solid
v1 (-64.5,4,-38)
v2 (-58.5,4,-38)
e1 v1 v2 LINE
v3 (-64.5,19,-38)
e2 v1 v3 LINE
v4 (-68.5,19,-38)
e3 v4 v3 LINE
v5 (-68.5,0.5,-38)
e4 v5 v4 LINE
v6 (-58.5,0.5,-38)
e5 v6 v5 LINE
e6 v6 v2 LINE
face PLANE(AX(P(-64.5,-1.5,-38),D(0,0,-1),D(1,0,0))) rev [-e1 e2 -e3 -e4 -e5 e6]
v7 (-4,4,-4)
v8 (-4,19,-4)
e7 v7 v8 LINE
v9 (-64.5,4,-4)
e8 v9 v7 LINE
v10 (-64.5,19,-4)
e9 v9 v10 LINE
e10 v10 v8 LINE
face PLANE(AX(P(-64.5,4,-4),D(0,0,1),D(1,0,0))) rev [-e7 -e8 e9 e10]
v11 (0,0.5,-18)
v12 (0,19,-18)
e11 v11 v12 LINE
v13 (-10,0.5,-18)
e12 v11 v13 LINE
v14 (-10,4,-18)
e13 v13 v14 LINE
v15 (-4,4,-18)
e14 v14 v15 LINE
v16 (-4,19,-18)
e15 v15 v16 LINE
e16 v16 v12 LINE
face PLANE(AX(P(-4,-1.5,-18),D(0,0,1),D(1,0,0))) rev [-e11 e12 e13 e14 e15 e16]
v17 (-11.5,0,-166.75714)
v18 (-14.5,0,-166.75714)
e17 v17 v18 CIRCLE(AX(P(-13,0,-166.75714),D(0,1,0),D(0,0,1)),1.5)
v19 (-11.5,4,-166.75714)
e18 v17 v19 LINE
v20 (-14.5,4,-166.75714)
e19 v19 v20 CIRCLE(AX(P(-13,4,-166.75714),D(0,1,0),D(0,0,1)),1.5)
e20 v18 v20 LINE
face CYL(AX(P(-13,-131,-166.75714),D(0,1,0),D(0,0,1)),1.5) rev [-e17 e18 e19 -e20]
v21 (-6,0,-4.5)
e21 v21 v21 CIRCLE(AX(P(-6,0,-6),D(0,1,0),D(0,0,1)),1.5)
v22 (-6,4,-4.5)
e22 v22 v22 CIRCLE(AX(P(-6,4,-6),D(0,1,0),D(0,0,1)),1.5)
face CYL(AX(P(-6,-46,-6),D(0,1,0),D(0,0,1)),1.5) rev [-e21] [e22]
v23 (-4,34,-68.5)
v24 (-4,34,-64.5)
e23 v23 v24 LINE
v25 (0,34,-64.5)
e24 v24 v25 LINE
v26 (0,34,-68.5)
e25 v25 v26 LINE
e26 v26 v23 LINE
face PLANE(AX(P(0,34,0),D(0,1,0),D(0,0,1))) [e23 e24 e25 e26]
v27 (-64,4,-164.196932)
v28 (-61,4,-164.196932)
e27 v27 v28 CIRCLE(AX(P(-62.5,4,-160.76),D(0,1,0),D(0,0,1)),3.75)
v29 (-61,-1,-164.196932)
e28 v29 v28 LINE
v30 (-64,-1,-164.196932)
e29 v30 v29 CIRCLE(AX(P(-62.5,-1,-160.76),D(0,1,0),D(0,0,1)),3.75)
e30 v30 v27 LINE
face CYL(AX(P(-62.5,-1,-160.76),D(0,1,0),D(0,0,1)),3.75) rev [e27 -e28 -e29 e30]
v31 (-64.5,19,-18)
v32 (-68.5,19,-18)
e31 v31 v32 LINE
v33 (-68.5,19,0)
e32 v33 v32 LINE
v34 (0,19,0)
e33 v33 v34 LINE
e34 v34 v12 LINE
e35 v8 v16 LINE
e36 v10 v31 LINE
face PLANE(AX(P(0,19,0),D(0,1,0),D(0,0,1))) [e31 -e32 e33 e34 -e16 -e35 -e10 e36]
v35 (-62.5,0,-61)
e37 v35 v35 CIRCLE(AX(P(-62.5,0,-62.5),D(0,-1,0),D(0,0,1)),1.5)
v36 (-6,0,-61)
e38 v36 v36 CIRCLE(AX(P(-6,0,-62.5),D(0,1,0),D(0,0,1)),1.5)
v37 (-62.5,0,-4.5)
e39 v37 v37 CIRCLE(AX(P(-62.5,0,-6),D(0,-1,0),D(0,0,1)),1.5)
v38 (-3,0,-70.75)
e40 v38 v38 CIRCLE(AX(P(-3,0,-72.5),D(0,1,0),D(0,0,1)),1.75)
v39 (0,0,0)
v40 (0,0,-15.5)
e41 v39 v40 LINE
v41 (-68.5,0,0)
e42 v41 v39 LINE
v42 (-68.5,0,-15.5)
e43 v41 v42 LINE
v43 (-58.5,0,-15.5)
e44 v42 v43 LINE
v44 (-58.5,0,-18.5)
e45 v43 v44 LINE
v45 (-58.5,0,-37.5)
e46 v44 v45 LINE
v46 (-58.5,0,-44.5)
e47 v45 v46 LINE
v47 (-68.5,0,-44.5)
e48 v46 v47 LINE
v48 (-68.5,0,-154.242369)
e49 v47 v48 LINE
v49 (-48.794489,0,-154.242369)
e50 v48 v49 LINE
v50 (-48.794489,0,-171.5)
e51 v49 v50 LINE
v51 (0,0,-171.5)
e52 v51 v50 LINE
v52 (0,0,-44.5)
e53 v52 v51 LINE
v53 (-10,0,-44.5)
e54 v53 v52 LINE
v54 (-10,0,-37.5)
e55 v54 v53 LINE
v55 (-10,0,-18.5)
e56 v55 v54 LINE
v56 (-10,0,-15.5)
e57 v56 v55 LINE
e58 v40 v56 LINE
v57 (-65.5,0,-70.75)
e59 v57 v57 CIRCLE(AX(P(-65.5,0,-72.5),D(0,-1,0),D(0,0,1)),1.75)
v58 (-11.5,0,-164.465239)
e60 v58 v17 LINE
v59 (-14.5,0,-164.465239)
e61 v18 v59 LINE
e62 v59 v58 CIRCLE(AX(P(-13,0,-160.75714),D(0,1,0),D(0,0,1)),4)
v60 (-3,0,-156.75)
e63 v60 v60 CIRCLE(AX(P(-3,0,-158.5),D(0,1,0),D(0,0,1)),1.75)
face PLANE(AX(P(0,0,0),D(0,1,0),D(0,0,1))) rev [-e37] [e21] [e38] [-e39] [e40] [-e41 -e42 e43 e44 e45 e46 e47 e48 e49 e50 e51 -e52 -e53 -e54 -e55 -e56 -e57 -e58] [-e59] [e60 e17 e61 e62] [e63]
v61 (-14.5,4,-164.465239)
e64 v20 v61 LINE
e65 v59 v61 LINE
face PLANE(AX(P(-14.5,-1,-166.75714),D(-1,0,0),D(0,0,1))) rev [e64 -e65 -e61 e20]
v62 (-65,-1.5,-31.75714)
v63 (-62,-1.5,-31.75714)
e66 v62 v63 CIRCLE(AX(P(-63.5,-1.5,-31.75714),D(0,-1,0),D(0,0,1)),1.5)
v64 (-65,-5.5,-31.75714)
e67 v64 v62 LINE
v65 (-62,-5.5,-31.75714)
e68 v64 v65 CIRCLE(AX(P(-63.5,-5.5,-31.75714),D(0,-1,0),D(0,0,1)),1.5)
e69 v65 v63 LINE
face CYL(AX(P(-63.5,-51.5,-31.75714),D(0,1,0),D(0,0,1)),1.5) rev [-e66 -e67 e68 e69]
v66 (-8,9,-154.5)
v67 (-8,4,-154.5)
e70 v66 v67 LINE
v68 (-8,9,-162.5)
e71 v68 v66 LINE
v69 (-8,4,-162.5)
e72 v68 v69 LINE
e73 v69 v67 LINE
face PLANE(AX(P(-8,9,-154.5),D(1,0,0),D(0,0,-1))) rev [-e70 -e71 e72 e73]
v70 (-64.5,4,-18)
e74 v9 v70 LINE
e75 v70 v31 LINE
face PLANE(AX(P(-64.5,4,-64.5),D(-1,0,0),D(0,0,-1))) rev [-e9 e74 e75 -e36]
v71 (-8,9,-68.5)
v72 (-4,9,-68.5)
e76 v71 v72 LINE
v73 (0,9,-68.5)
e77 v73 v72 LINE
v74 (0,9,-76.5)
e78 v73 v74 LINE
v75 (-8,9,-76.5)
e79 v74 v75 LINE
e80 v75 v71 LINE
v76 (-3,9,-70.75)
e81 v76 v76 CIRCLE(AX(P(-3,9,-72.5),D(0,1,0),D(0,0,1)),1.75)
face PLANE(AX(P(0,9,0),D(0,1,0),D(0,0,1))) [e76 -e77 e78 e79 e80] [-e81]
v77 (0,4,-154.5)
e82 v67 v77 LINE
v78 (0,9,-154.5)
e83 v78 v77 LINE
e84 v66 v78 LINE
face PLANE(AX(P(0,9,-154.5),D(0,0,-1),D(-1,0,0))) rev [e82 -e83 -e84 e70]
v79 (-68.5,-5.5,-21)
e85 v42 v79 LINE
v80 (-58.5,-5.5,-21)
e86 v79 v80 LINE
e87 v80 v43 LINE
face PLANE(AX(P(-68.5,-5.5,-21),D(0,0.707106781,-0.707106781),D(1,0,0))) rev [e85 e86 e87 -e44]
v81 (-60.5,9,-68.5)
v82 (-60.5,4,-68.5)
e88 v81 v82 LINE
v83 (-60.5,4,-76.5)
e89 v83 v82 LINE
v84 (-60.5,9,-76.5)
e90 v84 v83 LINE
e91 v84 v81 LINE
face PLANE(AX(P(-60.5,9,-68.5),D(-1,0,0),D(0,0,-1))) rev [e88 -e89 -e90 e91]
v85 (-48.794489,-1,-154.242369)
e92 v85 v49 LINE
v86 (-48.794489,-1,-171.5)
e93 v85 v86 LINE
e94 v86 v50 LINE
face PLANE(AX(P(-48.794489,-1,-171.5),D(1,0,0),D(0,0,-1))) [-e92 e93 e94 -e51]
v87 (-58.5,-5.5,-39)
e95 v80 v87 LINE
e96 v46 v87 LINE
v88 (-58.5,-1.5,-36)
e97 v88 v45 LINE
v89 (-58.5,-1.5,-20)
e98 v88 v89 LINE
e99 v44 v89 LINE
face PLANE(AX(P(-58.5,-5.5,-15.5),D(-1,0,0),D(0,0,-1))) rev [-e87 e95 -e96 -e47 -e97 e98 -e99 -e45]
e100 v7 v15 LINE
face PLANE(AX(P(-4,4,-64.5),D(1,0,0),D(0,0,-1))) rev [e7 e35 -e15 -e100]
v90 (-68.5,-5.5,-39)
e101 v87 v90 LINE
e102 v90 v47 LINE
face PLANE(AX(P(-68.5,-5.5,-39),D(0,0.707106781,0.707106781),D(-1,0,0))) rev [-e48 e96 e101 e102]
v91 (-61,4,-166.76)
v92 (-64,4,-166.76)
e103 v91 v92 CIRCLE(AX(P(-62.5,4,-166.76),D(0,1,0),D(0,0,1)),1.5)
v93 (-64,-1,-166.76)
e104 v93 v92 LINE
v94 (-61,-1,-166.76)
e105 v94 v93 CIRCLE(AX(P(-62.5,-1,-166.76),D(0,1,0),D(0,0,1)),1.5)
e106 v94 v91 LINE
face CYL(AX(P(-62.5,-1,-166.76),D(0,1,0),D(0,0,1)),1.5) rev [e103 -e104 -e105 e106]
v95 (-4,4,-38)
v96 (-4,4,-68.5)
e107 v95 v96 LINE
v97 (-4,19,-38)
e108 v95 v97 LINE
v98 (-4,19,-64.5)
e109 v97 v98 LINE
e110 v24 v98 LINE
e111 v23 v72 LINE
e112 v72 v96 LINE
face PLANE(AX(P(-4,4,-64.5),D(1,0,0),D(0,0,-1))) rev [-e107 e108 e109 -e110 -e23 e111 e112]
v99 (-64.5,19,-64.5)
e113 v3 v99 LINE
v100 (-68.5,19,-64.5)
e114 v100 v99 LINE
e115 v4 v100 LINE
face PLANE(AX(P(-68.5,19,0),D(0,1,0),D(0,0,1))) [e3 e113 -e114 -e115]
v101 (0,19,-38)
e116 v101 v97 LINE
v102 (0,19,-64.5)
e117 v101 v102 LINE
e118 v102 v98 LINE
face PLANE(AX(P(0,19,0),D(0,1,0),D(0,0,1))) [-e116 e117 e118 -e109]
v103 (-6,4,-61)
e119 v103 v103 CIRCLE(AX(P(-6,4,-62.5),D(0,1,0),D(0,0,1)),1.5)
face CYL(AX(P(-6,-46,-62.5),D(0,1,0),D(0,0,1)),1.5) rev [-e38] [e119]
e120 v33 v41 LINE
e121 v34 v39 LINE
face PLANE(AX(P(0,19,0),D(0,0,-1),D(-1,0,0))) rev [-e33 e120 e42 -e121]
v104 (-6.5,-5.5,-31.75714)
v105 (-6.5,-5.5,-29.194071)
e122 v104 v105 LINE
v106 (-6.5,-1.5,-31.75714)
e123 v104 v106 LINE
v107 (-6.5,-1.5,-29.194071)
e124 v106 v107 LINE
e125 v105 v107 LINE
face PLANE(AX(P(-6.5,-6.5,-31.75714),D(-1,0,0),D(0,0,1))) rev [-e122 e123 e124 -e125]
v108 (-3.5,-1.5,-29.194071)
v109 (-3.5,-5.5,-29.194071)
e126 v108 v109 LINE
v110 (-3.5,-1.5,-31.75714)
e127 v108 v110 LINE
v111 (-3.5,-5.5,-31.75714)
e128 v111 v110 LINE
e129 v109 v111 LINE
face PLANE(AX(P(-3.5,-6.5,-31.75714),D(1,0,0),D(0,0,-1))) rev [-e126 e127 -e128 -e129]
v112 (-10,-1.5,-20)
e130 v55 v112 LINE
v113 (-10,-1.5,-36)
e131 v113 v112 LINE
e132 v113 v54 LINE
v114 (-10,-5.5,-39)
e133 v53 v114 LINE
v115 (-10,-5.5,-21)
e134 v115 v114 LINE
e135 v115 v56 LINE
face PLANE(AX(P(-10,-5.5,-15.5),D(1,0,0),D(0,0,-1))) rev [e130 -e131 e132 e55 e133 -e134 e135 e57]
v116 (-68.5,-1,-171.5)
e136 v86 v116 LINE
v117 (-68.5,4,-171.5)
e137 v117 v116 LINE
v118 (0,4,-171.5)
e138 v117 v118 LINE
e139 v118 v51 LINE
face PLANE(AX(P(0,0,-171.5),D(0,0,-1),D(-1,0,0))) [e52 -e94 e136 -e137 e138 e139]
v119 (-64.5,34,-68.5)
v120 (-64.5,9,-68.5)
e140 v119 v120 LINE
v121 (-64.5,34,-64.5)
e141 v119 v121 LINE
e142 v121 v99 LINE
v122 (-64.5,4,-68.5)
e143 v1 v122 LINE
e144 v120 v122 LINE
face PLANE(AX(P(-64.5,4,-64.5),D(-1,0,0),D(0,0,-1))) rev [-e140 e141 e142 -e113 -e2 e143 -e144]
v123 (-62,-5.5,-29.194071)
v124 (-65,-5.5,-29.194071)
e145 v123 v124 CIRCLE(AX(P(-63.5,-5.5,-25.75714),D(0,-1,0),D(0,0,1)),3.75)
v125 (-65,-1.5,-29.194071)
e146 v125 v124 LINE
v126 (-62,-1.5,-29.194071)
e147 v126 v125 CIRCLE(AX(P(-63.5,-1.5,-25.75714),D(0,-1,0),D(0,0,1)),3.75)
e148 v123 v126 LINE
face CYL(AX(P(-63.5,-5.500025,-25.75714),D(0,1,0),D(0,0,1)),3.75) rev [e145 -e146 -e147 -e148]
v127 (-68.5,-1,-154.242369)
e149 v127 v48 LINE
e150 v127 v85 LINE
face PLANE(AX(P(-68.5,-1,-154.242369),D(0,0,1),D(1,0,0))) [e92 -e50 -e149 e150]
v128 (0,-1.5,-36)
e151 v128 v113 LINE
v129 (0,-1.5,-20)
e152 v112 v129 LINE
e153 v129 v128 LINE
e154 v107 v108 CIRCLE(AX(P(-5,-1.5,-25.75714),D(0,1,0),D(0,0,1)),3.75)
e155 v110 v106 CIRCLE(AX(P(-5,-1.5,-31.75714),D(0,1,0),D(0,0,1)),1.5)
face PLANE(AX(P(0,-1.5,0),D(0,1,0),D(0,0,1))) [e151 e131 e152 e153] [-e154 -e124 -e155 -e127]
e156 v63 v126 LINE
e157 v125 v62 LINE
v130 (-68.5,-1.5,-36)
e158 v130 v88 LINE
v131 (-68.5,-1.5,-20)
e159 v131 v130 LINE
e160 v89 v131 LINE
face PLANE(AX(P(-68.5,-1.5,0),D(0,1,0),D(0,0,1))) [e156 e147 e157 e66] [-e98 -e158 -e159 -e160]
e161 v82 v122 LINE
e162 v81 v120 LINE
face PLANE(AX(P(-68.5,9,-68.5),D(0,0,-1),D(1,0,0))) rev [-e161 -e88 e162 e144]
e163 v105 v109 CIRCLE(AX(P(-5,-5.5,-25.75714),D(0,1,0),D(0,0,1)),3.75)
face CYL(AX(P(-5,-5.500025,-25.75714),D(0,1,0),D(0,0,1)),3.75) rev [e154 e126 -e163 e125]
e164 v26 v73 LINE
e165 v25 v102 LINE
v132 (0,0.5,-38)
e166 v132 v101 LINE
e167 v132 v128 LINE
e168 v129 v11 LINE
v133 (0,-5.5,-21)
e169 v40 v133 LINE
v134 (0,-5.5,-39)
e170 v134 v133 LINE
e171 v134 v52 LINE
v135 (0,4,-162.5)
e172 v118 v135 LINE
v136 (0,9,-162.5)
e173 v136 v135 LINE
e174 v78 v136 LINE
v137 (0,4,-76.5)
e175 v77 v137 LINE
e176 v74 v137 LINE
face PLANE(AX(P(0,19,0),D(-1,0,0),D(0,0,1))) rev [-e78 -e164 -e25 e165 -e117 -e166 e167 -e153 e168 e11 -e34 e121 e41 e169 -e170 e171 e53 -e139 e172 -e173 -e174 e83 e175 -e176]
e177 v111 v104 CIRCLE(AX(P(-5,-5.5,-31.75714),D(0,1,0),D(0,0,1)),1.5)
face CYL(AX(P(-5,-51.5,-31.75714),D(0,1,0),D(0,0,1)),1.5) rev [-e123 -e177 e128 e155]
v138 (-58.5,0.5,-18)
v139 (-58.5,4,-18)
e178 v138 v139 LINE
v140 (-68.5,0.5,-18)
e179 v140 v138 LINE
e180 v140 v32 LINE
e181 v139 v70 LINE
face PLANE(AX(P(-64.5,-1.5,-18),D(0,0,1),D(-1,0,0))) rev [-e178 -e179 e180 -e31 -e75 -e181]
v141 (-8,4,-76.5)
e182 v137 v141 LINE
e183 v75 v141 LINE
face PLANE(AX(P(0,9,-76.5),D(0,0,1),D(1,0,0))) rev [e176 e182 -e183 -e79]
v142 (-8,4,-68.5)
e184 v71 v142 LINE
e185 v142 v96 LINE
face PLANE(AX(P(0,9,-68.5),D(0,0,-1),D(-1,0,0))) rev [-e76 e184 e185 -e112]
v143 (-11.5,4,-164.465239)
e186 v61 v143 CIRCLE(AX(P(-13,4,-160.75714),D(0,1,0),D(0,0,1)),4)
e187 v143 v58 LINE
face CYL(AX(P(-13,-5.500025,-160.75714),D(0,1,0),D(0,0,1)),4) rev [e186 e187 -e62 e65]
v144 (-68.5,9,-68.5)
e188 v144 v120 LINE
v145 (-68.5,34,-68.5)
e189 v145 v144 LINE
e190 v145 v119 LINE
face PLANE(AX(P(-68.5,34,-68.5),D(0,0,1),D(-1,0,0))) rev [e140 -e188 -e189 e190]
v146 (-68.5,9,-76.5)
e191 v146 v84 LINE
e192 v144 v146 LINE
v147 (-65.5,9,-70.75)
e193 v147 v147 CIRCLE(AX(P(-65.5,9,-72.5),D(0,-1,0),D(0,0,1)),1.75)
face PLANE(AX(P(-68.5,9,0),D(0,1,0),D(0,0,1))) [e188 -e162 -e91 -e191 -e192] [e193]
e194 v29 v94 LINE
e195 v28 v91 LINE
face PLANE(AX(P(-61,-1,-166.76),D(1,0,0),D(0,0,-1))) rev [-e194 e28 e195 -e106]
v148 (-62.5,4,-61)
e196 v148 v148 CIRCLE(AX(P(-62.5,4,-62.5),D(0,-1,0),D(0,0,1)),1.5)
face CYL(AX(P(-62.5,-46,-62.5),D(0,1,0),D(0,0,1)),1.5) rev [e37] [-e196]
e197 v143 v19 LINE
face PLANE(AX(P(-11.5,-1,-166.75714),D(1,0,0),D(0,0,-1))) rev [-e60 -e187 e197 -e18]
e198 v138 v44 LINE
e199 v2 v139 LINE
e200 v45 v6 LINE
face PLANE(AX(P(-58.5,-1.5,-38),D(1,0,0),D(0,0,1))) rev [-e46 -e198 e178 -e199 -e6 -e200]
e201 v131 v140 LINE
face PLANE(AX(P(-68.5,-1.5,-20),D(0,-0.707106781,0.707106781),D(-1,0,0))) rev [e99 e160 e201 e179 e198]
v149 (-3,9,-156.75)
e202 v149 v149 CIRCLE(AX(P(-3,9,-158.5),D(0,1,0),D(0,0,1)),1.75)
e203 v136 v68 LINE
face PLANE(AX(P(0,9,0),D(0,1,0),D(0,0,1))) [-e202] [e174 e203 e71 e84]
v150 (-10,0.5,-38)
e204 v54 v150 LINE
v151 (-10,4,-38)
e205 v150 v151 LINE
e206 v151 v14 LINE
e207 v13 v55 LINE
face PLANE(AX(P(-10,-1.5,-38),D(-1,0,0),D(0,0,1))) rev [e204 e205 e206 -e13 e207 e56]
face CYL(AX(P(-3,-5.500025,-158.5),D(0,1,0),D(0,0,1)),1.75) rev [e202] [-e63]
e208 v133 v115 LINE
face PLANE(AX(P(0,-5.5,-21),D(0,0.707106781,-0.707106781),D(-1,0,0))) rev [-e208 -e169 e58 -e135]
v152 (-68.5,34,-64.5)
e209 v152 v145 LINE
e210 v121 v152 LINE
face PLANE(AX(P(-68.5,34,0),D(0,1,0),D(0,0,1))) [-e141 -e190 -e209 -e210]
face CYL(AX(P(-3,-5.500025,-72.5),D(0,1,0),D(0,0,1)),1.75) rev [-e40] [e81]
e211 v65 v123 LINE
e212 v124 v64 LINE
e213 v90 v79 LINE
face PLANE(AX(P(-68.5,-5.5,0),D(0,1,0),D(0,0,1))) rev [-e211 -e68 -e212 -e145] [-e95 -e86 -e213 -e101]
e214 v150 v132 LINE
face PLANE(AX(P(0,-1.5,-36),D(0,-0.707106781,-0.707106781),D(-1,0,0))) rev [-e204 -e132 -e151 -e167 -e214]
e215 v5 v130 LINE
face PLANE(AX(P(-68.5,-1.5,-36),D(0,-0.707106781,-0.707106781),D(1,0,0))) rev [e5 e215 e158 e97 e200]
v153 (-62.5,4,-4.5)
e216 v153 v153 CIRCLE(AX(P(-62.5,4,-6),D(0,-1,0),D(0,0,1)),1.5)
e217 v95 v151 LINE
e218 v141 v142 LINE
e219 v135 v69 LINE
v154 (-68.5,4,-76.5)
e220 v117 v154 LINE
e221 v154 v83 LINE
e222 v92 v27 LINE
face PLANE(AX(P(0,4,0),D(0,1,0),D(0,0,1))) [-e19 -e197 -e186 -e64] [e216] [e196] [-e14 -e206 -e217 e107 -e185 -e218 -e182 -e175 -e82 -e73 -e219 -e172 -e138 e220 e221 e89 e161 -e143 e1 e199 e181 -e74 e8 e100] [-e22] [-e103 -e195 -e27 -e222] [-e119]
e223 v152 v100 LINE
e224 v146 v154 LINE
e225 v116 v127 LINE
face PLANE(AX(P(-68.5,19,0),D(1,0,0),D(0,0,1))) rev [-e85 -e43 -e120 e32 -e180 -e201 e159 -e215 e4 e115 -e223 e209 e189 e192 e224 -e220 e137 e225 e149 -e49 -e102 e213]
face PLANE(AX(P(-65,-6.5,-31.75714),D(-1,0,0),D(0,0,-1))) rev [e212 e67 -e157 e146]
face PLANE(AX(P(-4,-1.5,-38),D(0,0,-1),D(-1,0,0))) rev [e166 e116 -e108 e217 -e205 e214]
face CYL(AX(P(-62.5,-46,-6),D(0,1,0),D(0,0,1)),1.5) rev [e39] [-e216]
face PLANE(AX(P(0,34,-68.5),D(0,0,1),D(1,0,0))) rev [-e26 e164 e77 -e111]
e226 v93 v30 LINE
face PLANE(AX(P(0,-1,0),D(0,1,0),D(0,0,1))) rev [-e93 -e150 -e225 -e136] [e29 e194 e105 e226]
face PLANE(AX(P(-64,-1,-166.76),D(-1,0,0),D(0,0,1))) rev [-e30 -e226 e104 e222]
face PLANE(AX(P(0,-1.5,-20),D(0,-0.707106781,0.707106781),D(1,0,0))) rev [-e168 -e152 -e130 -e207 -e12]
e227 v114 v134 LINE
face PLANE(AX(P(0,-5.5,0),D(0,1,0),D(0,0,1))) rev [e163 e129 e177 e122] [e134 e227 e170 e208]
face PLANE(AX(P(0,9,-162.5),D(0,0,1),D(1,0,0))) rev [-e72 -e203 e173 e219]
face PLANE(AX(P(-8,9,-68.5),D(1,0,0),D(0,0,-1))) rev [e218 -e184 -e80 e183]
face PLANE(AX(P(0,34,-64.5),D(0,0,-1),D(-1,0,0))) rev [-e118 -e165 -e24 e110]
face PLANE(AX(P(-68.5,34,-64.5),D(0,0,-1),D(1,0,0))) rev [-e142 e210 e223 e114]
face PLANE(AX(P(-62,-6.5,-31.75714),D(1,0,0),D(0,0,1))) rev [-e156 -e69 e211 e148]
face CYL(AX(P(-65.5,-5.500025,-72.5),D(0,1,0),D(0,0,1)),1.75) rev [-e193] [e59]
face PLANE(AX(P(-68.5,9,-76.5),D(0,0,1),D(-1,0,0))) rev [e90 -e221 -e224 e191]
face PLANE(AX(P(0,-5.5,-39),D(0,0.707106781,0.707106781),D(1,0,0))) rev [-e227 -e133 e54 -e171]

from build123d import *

# Parameters (mm, degrees)
SKETCH1_W            = 68.5
SKETCH1_H            = 64.5
BOSS_EXTRUDE3_DEPTH  = 19
SKETCH3_W            = 60.5
SKETCH3_H            = 60.5
CUT_EXTRUDE1_DEPTH   = 15
SKETCH5_W            = 68.5
SKETCH5_H            = 4
BOSS_EXTRUDE4_DEPTH  = 105
SKETCH10_W           = 10
SKETCH10_H           = 29
BOSS_EXTRUDE5_DEPTH  = 5.5
SKETCH9_W            = 4
SKETCH9_H            = 20
CUT_EXTRUDE2_DEPTH   = 20.5
SKETCH11_W           = 6
SKETCH11_H           = 20
CUT_EXTRUDE3_DEPTH   = 5.5
CHAMFER2_SIZE        = 5.5
CHAMFER3_SIZE        = 2
SKETCH12_W           = 34.25
SKETCH12_H           = 169.5
CUT_EXTRUDE4_DEPTH   = 50
SKETCH15_R           = 1.5
CUT_EXTRUDE5_DEPTH   = 50
SKETCH16_R           = 1.5
CUT_EXTRUDE6_DEPTH   = 50
SKETCH17_R           = 1.5
CUT_EXTRUDE7_DEPTH   = 50
SKETCH19_W           = 34.25
SKETCH19_H           = 4
BOSS_EXTRUDE6_DEPTH  = 2
SKETCH26_W           = 4
SKETCH26_H           = 4
BOSS_EXTRUDE7_DEPTH  = 30
SKETCH20_R           = 3.75
CUT_EXTRUDE9_DEPTH   = 179.453250181
SKETCH21_W           = 3
SKETCH21_H           = 2.563068229
CUT_EXTRUDE10_DEPTH  = 5
SKETCH18_R           = 1.5
CUT_EXTRUDE8_DEPTH   = 135
SKETCH24_R           = 4
CUT_EXTRUDE13_DEPTH  = 178.441011325
SKETCH25_W           = 3
SKETCH25_H           = 2.291900756
CUT_EXTRUDE14_DEPTH  = 5
SKETCH27_R           = 1.75
CUT_EXTRUDE15_DEPTH  = 178.441011325
BOSS_EXTRUDE9_START  = 5
SKETCH30_W           = 8
SKETCH30_H           = 8
SKETCH30_R           = 1.75
BOSS_EXTRUDE9_DEPTH  = 5
SKETCH31_W           = 8
SKETCH31_H           = 8
CUT_EXTRUDE16_DEPTH  = 5
SKETCH32_W           = 19.705511252
SKETCH32_H           = 17.257631466
BOSS_EXTRUDE10_DEPTH = 5
SKETCH33_R           = 1.5
CUT_EXTRUDE17_DEPTH  = 5
SKETCH34_R           = 3.75
CUT_EXTRUDE18_DEPTH  = 5
SKETCH35_W           = 3
SKETCH35_H           = 2.563068229
CUT_EXTRUDE19_DEPTH  = 5


# Some blends are built 0.0001 mm under size
with BuildPart() as part:
    # Sketch1 → Boss-Extrude3 (new body)
    with BuildSketch(Plane(origin=(0, 0, 0), x_dir=(1, 0, 0), z_dir=(0, 1, 0))):
        with Locations((-34.25, 32.25)):
            Rectangle(SKETCH1_W, SKETCH1_H)
    extrude(amount=BOSS_EXTRUDE3_DEPTH)

    # Sketch3 → Cut-Extrude1 (cut)
    with BuildSketch(Plane(origin=(0, 19, 0), x_dir=(1, 0, 0), z_dir=(0, 1, 0))):
        with Locations((-34.25, 34.25)):
            Rectangle(SKETCH3_W, SKETCH3_H)
    extrude(amount=-CUT_EXTRUDE1_DEPTH, mode=Mode.SUBTRACT)

    # Sketch5 → Boss-Extrude4 (add)
    with BuildSketch(Plane(origin=(0, 0, -64.5), x_dir=(-1, 0, 0), z_dir=(0, 0, -1))):
        with Locations((34.25, 2)):
            Rectangle(SKETCH5_W, SKETCH5_H)
    extrude(amount=BOSS_EXTRUDE4_DEPTH)

    # Sketch10 → Boss-Extrude5 (add)
    with BuildSketch(Plane.XZ):
        with Locations((-5, -30)):
            Rectangle(SKETCH10_W, SKETCH10_H)
    extrude(amount=BOSS_EXTRUDE5_DEPTH)

    # Sketch9 → Cut-Extrude2 (cut)
    with BuildSketch(Plane(origin=(0, 19, 0), x_dir=(1, 0, 0), z_dir=(0, 1, 0))):
        with Locations((-2, 28)):
            Rectangle(SKETCH9_W, SKETCH9_H)
    extrude(amount=-CUT_EXTRUDE2_DEPTH, mode=Mode.SUBTRACT)

    # Sketch11 → Cut-Extrude3 (cut)
    with BuildSketch(Plane(origin=(0, 4, 0), x_dir=(1, 0, 0), z_dir=(0, 1, 0))):
        with Locations((-7, 28)):
            Rectangle(SKETCH11_W, SKETCH11_H)
    extrude(amount=-CUT_EXTRUDE3_DEPTH, mode=Mode.SUBTRACT)

    # Chamfer2
    chamfer2_edges = [part.edges().sort_by_distance(p)[0] for p in [
        (-5, -5.5, -44.5),
        (-5, -5.5, -15.5),
    ]]
    chamfer(chamfer2_edges, length=CHAMFER2_SIZE - 0.0001)  # a hair under: the kernel refuses the full size

    # Chamfer3
    # the kernel refuses this chamfer: 2 mm, written as the material it adds along each edge
    with BuildSketch(Plane(origin=(0, -1.5, -38), x_dir=(0, 0.9996219169112968, -0.027495876610585623), z_dir=(-1, 0, 0)), Plane(origin=(0, -1.5, -18), x_dir=(0, -0.027495876610586403, -0.9996219169112968), z_dir=(-1, 0, 0))) as chamfer3_piece_1:
        Polygon((CHAMFER3_SIZE * 0.999621916911, -CHAMFER3_SIZE * 0.0274958766106), (-CHAMFER3_SIZE * 0.0274958766106, -CHAMFER3_SIZE * 0.999621916911), (0, 0), align=None)
    extrude(amount=10)

    # Sketch12 → Cut-Extrude4 (cut)
    with BuildSketch(Plane(origin=(0, 19, 0), x_dir=(1, 0, 0), z_dir=(0, 1, 0))):
        with Locations((-51.375, 84.75)):
            Rectangle(SKETCH12_W, SKETCH12_H)
    extrude(amount=-CUT_EXTRUDE4_DEPTH, mode=Mode.SUBTRACT)

    # Sketch15 → Cut-Extrude5 (cut)
    with BuildSketch(Plane(origin=(0, -1.5, 0), x_dir=(1, 0, 0), z_dir=(0, 1, 0))):
        with Locations(Location((-5, 31.75713966, 0), (0, 0, 270))):
            Circle(SKETCH15_R)
    extrude(amount=-CUT_EXTRUDE5_DEPTH, mode=Mode.SUBTRACT)

    # Sketch16 → Cut-Extrude6 (cut)
    with BuildSketch(Plane(origin=(0, 4, 0), x_dir=(1, 0, 0), z_dir=(0, 1, 0))):
        with Locations(Location((-6, 6, 0), (0, 0, 270))):
            Circle(SKETCH16_R)
    extrude(amount=-CUT_EXTRUDE6_DEPTH, mode=Mode.SUBTRACT)

    # Sketch17 → Cut-Extrude7 (cut)
    with BuildSketch(Plane(origin=(0, 4, 0), x_dir=(1, 0, 0), z_dir=(0, 1, 0))):
        with Locations(Location((-6, 62.5, 0), (0, 0, 270))):
            Circle(SKETCH17_R)
    extrude(amount=-CUT_EXTRUDE7_DEPTH, mode=Mode.SUBTRACT)

    # Sketch19 → Boss-Extrude6 (add)
    with BuildSketch(Plane(origin=(0, 0, -169.5), x_dir=(-1, 0, 0), z_dir=(0, 0, -1))):
        with Locations((17.125, 2)):
            Rectangle(SKETCH19_W, SKETCH19_H)
    extrude(amount=BOSS_EXTRUDE6_DEPTH)

    # Sketch26 → Boss-Extrude7 (add)
    with BuildSketch(Plane(origin=(0, 4, 0), x_dir=(1, 0, 0), z_dir=(0, 1, 0))):
        with Locations((-2, 66.5)):
            Rectangle(SKETCH26_W, SKETCH26_H)
    extrude(amount=BOSS_EXTRUDE7_DEPTH)

    # Sketch20 → Cut-Extrude9 (cut, through all)
    with BuildSketch(Plane(origin=(0, -1.5, 0), x_dir=(1, 0, 0), z_dir=(0, 1, 0))):
        with Locations(Location((-5, 25.75713966, 0), (0, 0, 270))):
            Circle(SKETCH20_R)
    extrude(amount=-CUT_EXTRUDE9_DEPTH, mode=Mode.SUBTRACT)

    # Sketch21 → Cut-Extrude10 (cut)
    with BuildSketch(Plane(origin=(0, -1.5, 0), x_dir=(1, 0, 0), z_dir=(0, 1, 0))):
        with Locations((-5, 30.475605546)):
            Rectangle(SKETCH21_W, SKETCH21_H)
    extrude(amount=-CUT_EXTRUDE10_DEPTH, mode=Mode.SUBTRACT)

    # Sketch18 → Cut-Extrude8 (cut)
    with BuildSketch(Plane(origin=(0, 4, 0), x_dir=(1, 0, 0), z_dir=(0, 1, 0))):
        with Locations(Location((-13, 166.75713966, 0), (0, 0, 270))):
            Circle(SKETCH18_R)
    extrude(amount=-CUT_EXTRUDE8_DEPTH, mode=Mode.SUBTRACT)

    # Sketch24 → Cut-Extrude13 (cut, through all)
    with BuildSketch(Plane(origin=(0, 4, 0), x_dir=(1, 0, 0), z_dir=(0, 1, 0))):
        with Locations(Location((-13, 160.75713966, 0), (0, 0, 270))):
            Circle(SKETCH24_R)
    extrude(amount=-CUT_EXTRUDE13_DEPTH, mode=Mode.SUBTRACT)

    # Sketch25 → Cut-Extrude14 (cut)
    with BuildSketch(Plane(origin=(0, 4, 0), x_dir=(1, 0, 0), z_dir=(0, 1, 0))):
        with Locations((-13, 165.611189282)):
            Rectangle(SKETCH25_W, SKETCH25_H)
    extrude(amount=-CUT_EXTRUDE14_DEPTH, mode=Mode.SUBTRACT)

    # Sketch27 → Cut-Extrude15 (cut, through all)
    with BuildSketch(Plane(origin=(0, 4, 0), x_dir=(1, 0, 0), z_dir=(0, 1, 0))):
        with Locations(Location((-3, 72.5, 0), (0, 0, 270))):
            Circle(SKETCH27_R)
        with Locations(Location((-3, 158.5, 0), (0, 0, 270))):
            Circle(SKETCH27_R)
    extrude(amount=-CUT_EXTRUDE15_DEPTH, mode=Mode.SUBTRACT)

    # Sketch30 → Boss-Extrude9 (add)
    # profile 1 of 2: a face of its own
    with BuildSketch(Plane(origin=(0, 4, 0), x_dir=(1, 0, 0), z_dir=(0, 1, 0)).offset(BOSS_EXTRUDE9_START)):
        with Locations((-4, 72.5)):
            Rectangle(SKETCH30_W, SKETCH30_H)
        with Locations(Location((-3, 72.5, 0), (0, 0, 270))):
            Circle(SKETCH30_R, mode=Mode.SUBTRACT)
    # profile 2 of 2: a face of its own
    with BuildSketch(Plane(origin=(0, 4, 0), x_dir=(1, 0, 0), z_dir=(0, 1, 0)).offset(BOSS_EXTRUDE9_START)):
        with Locations((-4, 158.5)):
            Rectangle(SKETCH30_W, SKETCH30_H)
        with Locations(Location((-3, 158.5, 0), (0, 0, 270))):
            Circle(SKETCH30_R, mode=Mode.SUBTRACT)
    extrude(amount=-BOSS_EXTRUDE9_DEPTH)

    # Mirror5: part across plane


with BuildPart() as part_1:
    add(part.part)
    add(part.part.mirror(Plane(origin=(-34.25, 0, 0), x_dir=(0, 0, 1), z_dir=(1, 0, 0))))

    # Sketch31 → Cut-Extrude16 (cut)
    with BuildSketch(Plane(origin=(0, 9, 0), x_dir=(1, 0, 0), z_dir=(0, 1, 0))):
        with Locations((-64.5, 158.5)):
            Rectangle(SKETCH31_W, SKETCH31_H)
    extrude(amount=-CUT_EXTRUDE16_DEPTH, mode=Mode.SUBTRACT)

    # Sketch32 → Boss-Extrude10 (add)
    with BuildSketch(Plane(origin=(0, 4, 0), x_dir=(1, 0, 0), z_dir=(0, 1, 0))):
        with Locations((-58.647244374, 162.871184267)):
            Rectangle(SKETCH32_W, SKETCH32_H)
    extrude(amount=-BOSS_EXTRUDE10_DEPTH)

    # Sketch33 → Cut-Extrude17 (cut)
    with BuildSketch(Plane(origin=(0, 4, 0), x_dir=(1, 0, 0), z_dir=(0, 1, 0))):
        with Locations(Location((-62.5, 166.76, 0), (0, 0, 270))):
            Circle(SKETCH33_R)
    extrude(amount=-CUT_EXTRUDE17_DEPTH, mode=Mode.SUBTRACT)

    # Sketch34 → Cut-Extrude18 (cut)
    with BuildSketch(Plane(origin=(0, 4, 0), x_dir=(1, 0, 0), z_dir=(0, 1, 0))):
        with Locations(Location((-62.5, 160.76, 0), (0, 0, 270))):
            Circle(SKETCH34_R)
    extrude(amount=-CUT_EXTRUDE18_DEPTH, mode=Mode.SUBTRACT)

    # Sketch35 → Cut-Extrude19 (cut)
    with BuildSketch(Plane(origin=(0, 4, 0), x_dir=(1, 0, 0), z_dir=(0, 1, 0))):
        with Locations((-62.5, 165.478465886)):
            Rectangle(SKETCH35_W, SKETCH35_H)
    extrude(amount=-CUT_EXTRUDE19_DEPTH, mode=Mode.SUBTRACT)


solid = part_1.part
